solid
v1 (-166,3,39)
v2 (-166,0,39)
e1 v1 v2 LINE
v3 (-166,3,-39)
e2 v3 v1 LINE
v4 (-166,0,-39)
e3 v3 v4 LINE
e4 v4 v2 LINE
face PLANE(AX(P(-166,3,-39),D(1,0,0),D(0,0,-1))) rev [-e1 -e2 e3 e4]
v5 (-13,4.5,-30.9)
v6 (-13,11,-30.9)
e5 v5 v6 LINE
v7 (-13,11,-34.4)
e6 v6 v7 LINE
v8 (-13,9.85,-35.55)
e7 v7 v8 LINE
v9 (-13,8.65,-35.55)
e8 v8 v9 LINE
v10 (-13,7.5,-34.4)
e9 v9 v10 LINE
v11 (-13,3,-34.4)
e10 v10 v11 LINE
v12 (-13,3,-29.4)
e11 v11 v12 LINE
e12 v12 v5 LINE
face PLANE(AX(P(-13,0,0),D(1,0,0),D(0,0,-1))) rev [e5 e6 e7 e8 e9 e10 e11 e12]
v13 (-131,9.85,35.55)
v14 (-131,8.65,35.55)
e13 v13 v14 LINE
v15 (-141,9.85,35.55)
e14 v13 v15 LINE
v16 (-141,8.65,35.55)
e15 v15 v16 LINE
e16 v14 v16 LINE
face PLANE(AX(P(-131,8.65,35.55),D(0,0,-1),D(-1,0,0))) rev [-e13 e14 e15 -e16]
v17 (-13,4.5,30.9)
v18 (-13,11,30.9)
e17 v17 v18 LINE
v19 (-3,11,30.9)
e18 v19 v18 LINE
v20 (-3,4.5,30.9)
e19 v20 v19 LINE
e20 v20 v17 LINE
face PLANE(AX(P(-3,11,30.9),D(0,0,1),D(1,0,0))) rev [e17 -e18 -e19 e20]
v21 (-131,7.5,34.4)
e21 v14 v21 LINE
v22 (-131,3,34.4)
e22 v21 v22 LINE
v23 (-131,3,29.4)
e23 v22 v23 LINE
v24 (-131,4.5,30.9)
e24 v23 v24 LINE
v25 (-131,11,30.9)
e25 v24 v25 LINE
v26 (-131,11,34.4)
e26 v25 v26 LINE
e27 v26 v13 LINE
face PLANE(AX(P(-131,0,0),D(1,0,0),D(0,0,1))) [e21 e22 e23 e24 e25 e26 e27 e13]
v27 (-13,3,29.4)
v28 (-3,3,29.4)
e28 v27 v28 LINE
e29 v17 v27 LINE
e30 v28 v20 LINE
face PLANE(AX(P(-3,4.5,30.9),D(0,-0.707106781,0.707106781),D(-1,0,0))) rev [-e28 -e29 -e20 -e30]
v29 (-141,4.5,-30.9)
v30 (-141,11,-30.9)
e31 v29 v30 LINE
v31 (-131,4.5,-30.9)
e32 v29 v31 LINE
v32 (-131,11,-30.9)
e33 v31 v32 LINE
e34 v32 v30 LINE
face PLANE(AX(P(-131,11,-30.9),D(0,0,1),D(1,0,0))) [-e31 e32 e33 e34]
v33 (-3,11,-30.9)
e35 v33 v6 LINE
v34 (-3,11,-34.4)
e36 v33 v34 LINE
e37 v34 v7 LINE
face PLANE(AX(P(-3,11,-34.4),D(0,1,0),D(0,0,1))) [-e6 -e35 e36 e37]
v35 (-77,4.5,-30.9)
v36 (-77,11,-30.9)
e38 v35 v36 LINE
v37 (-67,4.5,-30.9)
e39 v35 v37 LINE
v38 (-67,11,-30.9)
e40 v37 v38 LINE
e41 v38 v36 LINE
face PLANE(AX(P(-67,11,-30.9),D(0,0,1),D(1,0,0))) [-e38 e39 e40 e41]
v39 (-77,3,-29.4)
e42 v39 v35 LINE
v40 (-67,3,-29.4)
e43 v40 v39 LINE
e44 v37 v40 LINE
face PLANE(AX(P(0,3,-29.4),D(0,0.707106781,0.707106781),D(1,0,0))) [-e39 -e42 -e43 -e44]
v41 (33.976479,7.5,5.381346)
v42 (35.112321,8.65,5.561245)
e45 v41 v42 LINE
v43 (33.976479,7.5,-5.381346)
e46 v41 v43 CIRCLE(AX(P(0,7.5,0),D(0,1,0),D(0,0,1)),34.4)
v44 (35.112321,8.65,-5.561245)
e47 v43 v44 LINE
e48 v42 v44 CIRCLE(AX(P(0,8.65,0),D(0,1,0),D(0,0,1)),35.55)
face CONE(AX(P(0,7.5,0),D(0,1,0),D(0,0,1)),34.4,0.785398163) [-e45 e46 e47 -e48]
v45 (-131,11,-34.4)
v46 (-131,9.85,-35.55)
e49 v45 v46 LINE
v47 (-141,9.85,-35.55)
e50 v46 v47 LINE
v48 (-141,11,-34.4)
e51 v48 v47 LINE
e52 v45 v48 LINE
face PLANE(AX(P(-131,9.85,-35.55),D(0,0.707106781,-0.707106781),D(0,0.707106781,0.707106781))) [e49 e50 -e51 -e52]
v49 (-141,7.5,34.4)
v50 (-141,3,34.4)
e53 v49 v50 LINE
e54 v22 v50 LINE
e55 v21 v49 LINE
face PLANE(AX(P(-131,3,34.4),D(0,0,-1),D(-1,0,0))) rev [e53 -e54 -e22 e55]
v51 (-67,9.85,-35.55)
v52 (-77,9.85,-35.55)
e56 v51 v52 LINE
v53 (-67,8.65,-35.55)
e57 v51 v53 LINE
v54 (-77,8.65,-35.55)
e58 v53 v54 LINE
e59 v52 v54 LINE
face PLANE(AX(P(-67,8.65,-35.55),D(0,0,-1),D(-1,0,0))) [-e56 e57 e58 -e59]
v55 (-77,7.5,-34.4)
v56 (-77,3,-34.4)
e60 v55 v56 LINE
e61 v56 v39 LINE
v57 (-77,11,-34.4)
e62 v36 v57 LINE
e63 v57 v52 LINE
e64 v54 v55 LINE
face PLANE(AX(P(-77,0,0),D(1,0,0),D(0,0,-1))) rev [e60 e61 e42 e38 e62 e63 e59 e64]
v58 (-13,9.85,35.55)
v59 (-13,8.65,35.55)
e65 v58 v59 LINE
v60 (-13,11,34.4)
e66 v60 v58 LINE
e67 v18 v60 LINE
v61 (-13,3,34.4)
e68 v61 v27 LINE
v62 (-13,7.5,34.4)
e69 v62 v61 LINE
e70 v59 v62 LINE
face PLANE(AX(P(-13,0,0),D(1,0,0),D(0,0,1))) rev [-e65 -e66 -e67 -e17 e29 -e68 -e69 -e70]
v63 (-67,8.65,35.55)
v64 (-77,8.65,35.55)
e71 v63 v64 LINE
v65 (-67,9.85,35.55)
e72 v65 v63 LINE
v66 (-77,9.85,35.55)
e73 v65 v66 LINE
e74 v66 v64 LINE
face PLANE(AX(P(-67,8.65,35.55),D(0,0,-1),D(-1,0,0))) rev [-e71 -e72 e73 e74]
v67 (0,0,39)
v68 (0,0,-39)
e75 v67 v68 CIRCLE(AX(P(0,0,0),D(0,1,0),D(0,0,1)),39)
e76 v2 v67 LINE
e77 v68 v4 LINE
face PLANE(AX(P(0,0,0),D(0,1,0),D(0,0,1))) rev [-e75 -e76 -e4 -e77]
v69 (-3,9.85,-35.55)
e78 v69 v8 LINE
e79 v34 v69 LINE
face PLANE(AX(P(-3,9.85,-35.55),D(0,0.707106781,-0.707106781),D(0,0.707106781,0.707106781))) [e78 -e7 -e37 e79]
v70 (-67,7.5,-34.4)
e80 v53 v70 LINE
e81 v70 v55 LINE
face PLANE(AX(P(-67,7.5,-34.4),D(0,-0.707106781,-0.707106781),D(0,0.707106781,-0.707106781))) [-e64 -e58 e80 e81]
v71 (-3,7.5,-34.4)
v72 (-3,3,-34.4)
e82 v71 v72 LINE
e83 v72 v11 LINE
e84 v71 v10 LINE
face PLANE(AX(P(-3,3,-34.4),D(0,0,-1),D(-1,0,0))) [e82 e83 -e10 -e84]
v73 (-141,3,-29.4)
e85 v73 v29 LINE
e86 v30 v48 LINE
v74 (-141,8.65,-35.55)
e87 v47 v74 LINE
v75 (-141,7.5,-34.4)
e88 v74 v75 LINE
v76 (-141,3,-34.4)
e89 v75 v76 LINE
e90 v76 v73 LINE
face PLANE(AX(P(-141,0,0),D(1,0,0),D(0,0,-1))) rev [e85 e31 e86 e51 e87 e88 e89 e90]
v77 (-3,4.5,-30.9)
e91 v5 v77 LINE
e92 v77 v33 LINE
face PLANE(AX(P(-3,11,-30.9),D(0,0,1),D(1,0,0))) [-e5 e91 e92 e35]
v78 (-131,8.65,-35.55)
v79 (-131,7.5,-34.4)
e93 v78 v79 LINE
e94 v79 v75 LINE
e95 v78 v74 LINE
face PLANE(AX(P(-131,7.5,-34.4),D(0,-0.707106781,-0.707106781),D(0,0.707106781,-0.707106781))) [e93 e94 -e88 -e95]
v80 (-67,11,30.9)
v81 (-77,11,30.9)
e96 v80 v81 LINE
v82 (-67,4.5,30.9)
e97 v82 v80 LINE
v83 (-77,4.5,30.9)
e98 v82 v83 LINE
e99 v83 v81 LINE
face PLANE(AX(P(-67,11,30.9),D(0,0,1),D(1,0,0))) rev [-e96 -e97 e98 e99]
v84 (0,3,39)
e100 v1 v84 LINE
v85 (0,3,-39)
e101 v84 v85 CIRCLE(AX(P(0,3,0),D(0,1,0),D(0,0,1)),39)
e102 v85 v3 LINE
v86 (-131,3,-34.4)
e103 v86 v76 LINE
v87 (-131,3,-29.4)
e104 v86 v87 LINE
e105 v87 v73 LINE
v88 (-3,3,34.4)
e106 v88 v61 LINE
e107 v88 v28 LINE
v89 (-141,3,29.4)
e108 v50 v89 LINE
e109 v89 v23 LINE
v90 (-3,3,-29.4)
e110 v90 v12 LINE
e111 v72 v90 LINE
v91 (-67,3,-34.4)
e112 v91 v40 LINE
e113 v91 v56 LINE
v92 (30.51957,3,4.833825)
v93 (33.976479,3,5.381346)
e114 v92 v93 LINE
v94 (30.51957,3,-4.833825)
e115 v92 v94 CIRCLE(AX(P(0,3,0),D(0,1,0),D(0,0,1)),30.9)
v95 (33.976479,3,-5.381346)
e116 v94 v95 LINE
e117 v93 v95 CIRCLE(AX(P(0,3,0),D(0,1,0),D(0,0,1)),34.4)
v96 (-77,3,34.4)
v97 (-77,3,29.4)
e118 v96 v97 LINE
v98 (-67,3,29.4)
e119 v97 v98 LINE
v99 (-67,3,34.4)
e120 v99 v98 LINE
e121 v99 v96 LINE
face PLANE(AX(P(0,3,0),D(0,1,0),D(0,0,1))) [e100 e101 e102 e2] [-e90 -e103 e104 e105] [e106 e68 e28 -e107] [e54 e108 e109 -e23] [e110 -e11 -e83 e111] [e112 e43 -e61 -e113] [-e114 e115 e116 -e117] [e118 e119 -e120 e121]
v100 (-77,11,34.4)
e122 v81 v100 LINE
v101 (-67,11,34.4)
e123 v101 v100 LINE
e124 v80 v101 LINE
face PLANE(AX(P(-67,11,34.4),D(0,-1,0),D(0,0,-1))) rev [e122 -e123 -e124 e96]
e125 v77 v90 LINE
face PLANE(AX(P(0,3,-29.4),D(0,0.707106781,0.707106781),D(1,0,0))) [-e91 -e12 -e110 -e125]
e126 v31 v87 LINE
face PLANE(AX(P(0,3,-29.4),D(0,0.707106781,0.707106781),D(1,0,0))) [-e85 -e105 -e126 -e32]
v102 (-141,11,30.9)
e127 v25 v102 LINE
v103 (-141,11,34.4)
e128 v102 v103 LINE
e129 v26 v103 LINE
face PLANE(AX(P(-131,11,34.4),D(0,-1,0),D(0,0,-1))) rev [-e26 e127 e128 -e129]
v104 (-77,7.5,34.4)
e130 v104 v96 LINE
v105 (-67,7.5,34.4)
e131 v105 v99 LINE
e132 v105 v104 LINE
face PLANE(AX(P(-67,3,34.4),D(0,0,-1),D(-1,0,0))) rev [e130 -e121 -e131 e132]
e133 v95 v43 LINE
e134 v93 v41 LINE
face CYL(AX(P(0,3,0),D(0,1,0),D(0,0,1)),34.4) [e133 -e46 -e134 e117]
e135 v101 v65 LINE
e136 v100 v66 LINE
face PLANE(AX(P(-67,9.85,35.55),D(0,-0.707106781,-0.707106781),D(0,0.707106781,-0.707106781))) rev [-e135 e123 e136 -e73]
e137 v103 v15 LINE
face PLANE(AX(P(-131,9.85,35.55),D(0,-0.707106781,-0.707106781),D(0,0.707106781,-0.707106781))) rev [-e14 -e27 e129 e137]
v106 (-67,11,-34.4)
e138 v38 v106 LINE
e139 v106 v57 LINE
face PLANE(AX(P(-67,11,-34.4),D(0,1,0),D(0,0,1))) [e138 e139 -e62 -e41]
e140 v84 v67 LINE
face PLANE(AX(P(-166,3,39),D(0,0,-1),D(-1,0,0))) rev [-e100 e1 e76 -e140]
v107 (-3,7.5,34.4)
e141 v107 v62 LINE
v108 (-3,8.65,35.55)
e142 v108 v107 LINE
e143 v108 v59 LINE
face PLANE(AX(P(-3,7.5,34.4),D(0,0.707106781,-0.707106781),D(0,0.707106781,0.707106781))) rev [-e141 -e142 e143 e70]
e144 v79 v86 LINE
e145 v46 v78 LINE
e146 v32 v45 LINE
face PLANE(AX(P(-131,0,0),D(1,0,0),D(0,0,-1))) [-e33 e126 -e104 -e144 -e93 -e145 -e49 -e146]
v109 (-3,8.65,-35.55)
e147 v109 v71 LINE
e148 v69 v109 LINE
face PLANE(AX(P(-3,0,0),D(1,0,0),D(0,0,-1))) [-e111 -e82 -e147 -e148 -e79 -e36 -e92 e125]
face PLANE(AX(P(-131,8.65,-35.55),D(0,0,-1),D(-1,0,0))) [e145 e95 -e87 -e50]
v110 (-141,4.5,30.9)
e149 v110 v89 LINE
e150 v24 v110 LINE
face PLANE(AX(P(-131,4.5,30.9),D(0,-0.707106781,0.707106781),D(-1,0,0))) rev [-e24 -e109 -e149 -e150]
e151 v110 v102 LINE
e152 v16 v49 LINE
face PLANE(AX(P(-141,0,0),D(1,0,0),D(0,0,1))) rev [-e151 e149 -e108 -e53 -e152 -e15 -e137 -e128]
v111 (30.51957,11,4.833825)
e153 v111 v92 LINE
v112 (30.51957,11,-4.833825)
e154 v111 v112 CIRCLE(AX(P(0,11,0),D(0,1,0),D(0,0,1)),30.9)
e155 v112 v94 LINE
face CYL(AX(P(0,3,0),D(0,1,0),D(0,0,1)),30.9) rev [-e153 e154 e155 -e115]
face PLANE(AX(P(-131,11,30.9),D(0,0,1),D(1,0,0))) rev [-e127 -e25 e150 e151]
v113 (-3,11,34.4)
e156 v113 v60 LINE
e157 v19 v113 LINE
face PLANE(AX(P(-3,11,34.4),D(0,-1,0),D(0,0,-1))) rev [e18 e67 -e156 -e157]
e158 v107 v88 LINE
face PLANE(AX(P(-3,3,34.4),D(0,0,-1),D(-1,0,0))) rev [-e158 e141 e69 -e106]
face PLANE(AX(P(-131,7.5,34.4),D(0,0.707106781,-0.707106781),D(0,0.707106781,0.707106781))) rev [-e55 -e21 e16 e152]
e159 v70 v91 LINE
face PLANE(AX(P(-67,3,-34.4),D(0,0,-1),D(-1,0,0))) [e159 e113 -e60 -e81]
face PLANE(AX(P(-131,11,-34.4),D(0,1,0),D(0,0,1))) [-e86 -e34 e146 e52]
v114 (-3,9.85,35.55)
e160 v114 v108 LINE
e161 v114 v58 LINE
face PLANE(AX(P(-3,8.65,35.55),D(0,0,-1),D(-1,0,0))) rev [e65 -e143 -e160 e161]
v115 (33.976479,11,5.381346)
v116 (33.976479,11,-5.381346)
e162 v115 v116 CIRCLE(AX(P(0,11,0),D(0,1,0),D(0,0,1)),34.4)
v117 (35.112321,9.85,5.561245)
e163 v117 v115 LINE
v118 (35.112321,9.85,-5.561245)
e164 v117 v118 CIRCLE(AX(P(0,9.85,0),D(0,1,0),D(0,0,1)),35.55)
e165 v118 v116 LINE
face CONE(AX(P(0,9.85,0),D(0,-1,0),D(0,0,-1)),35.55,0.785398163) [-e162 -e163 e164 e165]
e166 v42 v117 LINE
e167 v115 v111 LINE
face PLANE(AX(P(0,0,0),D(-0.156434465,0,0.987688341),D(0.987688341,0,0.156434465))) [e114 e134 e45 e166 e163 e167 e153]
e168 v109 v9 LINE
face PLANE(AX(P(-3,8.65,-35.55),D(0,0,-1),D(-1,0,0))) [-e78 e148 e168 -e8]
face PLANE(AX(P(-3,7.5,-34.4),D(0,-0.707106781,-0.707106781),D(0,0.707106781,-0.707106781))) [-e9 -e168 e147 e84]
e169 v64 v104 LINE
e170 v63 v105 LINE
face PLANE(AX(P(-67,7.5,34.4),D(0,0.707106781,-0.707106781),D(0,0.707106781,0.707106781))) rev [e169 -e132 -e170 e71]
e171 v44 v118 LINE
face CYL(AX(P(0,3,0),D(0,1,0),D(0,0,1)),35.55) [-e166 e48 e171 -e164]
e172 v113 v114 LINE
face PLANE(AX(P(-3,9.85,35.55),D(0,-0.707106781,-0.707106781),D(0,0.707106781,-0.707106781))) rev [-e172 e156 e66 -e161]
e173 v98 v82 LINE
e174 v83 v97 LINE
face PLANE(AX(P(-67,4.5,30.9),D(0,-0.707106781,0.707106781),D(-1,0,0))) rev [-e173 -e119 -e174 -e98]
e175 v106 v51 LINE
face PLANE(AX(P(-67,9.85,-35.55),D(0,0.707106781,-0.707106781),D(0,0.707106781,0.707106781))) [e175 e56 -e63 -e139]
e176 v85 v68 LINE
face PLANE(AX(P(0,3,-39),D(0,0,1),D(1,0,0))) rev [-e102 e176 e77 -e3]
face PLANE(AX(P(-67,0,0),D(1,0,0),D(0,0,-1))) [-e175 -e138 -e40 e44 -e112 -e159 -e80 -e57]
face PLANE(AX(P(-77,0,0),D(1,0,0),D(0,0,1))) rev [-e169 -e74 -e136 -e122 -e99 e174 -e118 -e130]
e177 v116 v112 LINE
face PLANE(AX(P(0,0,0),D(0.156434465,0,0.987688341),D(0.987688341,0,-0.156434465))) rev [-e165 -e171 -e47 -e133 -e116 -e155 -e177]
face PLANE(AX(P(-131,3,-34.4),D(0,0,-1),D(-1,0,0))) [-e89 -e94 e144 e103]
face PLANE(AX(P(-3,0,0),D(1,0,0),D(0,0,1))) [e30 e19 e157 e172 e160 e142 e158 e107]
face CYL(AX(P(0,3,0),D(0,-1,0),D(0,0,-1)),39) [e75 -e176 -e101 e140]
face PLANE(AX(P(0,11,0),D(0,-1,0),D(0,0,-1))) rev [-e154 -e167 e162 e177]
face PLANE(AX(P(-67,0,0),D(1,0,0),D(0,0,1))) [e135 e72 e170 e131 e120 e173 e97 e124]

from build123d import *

# Parameters (mm, degrees)
BOSS_EXTRUDE1_DEPTH        = 3
BOSS_EXTRUDE2_DEPTH        = 10
CHAMFER1_SIZE              = 1.5
LPATTERN1_COUNT            = 3
LPATTERN1_PITCH            = 64
CHAMFER1_OF_LPATTERN1_SIZE = 1.5
MIRROR1_START              = -141
MIRROR1_DEPTH              = 10
MIRROR1_START_2            = -77
MIRROR1_2_DEPTH            = 10
MIRROR1_START_3            = -13
MIRROR1_3_DEPTH            = 10
REVOLVE1_ANGLE             = 18


# Read off the part's stored shape, not the designer's step: Mirror1
with BuildPart() as part:
    # Sketch1 → Boss-Extrude1 (new body)
    with BuildSketch(Plane(origin=(0, 0, 0), x_dir=(1, 0, 0), z_dir=(0, 1, 0))):
        with BuildLine():
            Line((0, 39), (-166, 39))
            Line((-166, 39), (-166, -39))
            Line((-166, -39), (0, -39))
            ThreePointArc((0, -39), (39, 0), (0, 39))
        make_face()
    extrude(amount=BOSS_EXTRUDE1_DEPTH)

    # Sketch3 → Boss-Extrude2 (add)
    with BuildSketch(Plane.ZY.offset(141)):
        Polygon((-34.4, 3), (-34.4, 7.5), (-35.55, 8.65), (-35.55, 9.85), (-34.4, 11), (-30.9, 11), (-30.9, 3), align=None)
    boss_extrude2 = extrude(amount=-BOSS_EXTRUDE2_DEPTH)

    # Chamfer1
    chamfer1_edges = [part.edges().sort_by_distance(p)[0] for p in [
        (-136, 3, -30.9),
    ]]
    chamfer(chamfer1_edges, length=CHAMFER1_SIZE)

    # LPattern1: Boss-Extrude2 ×3
    with Locations(*[(i * LPATTERN1_PITCH, 0, 0) for i in range(1, LPATTERN1_COUNT)]):
        add(boss_extrude2)

    # Chamfer1 of LPattern1
    chamfer1_of_lpattern1_edges = [part.edges().sort_by_distance(p)[0] for p in [
        (-72, 3, -30.9),
        (-8, 3, -30.9),
    ]]
    chamfer(chamfer1_of_lpattern1_edges, length=CHAMFER1_OF_LPATTERN1_SIZE)

    # Mirror1 outline → Mirror1 (add)
    with BuildSketch(Plane.YZ.offset(MIRROR1_START)):
        Polygon((11, 30.9), (11, 34.4), (9.85, 35.55), (8.65, 35.55), (7.5, 34.4), (3, 34.4), (3, 29.4), (4.5, 30.9), align=None)
    extrude(amount=MIRROR1_DEPTH)

    # Mirror1 2 outline → Mirror1 2 (add)
    with BuildSketch(Plane.YZ.offset(MIRROR1_START_2)):
        Polygon((11, 30.9), (11, 34.4), (9.85, 35.55), (8.65, 35.55), (7.5, 34.4), (3, 34.4), (3, 29.4), (4.5, 30.9), align=None)
    extrude(amount=MIRROR1_2_DEPTH)

    # Mirror1 3 outline → Mirror1 3 (add)
    with BuildSketch(Plane.YZ.offset(MIRROR1_START_3)):
        Polygon((11, 30.9), (11, 34.4), (9.85, 35.55), (8.65, 35.55), (7.5, 34.4), (3, 34.4), (3, 29.4), (4.5, 30.9), align=None)
    extrude(amount=MIRROR1_3_DEPTH)

    # Sketch4 → Revolve1 (revolve, symmetric)
    with BuildSketch(Plane.XY) as revolve1_sk:
        Polygon((30.9, 11), (30.9, 3), (34.4, 3), (34.4, 7.5), (35.55, 8.65), (35.55, 9.85), (34.4, 11), align=None)
    revolve(axis=Axis((0, 3, 0), (0, -1, 0)), revolution_arc=REVOLVE1_ANGLE / 2)
    revolve(revolve1_sk.sketch, axis=Axis((0, 3, 0), (0, 1, 0)), revolution_arc=REVOLVE1_ANGLE / 2)


solid = part.part
